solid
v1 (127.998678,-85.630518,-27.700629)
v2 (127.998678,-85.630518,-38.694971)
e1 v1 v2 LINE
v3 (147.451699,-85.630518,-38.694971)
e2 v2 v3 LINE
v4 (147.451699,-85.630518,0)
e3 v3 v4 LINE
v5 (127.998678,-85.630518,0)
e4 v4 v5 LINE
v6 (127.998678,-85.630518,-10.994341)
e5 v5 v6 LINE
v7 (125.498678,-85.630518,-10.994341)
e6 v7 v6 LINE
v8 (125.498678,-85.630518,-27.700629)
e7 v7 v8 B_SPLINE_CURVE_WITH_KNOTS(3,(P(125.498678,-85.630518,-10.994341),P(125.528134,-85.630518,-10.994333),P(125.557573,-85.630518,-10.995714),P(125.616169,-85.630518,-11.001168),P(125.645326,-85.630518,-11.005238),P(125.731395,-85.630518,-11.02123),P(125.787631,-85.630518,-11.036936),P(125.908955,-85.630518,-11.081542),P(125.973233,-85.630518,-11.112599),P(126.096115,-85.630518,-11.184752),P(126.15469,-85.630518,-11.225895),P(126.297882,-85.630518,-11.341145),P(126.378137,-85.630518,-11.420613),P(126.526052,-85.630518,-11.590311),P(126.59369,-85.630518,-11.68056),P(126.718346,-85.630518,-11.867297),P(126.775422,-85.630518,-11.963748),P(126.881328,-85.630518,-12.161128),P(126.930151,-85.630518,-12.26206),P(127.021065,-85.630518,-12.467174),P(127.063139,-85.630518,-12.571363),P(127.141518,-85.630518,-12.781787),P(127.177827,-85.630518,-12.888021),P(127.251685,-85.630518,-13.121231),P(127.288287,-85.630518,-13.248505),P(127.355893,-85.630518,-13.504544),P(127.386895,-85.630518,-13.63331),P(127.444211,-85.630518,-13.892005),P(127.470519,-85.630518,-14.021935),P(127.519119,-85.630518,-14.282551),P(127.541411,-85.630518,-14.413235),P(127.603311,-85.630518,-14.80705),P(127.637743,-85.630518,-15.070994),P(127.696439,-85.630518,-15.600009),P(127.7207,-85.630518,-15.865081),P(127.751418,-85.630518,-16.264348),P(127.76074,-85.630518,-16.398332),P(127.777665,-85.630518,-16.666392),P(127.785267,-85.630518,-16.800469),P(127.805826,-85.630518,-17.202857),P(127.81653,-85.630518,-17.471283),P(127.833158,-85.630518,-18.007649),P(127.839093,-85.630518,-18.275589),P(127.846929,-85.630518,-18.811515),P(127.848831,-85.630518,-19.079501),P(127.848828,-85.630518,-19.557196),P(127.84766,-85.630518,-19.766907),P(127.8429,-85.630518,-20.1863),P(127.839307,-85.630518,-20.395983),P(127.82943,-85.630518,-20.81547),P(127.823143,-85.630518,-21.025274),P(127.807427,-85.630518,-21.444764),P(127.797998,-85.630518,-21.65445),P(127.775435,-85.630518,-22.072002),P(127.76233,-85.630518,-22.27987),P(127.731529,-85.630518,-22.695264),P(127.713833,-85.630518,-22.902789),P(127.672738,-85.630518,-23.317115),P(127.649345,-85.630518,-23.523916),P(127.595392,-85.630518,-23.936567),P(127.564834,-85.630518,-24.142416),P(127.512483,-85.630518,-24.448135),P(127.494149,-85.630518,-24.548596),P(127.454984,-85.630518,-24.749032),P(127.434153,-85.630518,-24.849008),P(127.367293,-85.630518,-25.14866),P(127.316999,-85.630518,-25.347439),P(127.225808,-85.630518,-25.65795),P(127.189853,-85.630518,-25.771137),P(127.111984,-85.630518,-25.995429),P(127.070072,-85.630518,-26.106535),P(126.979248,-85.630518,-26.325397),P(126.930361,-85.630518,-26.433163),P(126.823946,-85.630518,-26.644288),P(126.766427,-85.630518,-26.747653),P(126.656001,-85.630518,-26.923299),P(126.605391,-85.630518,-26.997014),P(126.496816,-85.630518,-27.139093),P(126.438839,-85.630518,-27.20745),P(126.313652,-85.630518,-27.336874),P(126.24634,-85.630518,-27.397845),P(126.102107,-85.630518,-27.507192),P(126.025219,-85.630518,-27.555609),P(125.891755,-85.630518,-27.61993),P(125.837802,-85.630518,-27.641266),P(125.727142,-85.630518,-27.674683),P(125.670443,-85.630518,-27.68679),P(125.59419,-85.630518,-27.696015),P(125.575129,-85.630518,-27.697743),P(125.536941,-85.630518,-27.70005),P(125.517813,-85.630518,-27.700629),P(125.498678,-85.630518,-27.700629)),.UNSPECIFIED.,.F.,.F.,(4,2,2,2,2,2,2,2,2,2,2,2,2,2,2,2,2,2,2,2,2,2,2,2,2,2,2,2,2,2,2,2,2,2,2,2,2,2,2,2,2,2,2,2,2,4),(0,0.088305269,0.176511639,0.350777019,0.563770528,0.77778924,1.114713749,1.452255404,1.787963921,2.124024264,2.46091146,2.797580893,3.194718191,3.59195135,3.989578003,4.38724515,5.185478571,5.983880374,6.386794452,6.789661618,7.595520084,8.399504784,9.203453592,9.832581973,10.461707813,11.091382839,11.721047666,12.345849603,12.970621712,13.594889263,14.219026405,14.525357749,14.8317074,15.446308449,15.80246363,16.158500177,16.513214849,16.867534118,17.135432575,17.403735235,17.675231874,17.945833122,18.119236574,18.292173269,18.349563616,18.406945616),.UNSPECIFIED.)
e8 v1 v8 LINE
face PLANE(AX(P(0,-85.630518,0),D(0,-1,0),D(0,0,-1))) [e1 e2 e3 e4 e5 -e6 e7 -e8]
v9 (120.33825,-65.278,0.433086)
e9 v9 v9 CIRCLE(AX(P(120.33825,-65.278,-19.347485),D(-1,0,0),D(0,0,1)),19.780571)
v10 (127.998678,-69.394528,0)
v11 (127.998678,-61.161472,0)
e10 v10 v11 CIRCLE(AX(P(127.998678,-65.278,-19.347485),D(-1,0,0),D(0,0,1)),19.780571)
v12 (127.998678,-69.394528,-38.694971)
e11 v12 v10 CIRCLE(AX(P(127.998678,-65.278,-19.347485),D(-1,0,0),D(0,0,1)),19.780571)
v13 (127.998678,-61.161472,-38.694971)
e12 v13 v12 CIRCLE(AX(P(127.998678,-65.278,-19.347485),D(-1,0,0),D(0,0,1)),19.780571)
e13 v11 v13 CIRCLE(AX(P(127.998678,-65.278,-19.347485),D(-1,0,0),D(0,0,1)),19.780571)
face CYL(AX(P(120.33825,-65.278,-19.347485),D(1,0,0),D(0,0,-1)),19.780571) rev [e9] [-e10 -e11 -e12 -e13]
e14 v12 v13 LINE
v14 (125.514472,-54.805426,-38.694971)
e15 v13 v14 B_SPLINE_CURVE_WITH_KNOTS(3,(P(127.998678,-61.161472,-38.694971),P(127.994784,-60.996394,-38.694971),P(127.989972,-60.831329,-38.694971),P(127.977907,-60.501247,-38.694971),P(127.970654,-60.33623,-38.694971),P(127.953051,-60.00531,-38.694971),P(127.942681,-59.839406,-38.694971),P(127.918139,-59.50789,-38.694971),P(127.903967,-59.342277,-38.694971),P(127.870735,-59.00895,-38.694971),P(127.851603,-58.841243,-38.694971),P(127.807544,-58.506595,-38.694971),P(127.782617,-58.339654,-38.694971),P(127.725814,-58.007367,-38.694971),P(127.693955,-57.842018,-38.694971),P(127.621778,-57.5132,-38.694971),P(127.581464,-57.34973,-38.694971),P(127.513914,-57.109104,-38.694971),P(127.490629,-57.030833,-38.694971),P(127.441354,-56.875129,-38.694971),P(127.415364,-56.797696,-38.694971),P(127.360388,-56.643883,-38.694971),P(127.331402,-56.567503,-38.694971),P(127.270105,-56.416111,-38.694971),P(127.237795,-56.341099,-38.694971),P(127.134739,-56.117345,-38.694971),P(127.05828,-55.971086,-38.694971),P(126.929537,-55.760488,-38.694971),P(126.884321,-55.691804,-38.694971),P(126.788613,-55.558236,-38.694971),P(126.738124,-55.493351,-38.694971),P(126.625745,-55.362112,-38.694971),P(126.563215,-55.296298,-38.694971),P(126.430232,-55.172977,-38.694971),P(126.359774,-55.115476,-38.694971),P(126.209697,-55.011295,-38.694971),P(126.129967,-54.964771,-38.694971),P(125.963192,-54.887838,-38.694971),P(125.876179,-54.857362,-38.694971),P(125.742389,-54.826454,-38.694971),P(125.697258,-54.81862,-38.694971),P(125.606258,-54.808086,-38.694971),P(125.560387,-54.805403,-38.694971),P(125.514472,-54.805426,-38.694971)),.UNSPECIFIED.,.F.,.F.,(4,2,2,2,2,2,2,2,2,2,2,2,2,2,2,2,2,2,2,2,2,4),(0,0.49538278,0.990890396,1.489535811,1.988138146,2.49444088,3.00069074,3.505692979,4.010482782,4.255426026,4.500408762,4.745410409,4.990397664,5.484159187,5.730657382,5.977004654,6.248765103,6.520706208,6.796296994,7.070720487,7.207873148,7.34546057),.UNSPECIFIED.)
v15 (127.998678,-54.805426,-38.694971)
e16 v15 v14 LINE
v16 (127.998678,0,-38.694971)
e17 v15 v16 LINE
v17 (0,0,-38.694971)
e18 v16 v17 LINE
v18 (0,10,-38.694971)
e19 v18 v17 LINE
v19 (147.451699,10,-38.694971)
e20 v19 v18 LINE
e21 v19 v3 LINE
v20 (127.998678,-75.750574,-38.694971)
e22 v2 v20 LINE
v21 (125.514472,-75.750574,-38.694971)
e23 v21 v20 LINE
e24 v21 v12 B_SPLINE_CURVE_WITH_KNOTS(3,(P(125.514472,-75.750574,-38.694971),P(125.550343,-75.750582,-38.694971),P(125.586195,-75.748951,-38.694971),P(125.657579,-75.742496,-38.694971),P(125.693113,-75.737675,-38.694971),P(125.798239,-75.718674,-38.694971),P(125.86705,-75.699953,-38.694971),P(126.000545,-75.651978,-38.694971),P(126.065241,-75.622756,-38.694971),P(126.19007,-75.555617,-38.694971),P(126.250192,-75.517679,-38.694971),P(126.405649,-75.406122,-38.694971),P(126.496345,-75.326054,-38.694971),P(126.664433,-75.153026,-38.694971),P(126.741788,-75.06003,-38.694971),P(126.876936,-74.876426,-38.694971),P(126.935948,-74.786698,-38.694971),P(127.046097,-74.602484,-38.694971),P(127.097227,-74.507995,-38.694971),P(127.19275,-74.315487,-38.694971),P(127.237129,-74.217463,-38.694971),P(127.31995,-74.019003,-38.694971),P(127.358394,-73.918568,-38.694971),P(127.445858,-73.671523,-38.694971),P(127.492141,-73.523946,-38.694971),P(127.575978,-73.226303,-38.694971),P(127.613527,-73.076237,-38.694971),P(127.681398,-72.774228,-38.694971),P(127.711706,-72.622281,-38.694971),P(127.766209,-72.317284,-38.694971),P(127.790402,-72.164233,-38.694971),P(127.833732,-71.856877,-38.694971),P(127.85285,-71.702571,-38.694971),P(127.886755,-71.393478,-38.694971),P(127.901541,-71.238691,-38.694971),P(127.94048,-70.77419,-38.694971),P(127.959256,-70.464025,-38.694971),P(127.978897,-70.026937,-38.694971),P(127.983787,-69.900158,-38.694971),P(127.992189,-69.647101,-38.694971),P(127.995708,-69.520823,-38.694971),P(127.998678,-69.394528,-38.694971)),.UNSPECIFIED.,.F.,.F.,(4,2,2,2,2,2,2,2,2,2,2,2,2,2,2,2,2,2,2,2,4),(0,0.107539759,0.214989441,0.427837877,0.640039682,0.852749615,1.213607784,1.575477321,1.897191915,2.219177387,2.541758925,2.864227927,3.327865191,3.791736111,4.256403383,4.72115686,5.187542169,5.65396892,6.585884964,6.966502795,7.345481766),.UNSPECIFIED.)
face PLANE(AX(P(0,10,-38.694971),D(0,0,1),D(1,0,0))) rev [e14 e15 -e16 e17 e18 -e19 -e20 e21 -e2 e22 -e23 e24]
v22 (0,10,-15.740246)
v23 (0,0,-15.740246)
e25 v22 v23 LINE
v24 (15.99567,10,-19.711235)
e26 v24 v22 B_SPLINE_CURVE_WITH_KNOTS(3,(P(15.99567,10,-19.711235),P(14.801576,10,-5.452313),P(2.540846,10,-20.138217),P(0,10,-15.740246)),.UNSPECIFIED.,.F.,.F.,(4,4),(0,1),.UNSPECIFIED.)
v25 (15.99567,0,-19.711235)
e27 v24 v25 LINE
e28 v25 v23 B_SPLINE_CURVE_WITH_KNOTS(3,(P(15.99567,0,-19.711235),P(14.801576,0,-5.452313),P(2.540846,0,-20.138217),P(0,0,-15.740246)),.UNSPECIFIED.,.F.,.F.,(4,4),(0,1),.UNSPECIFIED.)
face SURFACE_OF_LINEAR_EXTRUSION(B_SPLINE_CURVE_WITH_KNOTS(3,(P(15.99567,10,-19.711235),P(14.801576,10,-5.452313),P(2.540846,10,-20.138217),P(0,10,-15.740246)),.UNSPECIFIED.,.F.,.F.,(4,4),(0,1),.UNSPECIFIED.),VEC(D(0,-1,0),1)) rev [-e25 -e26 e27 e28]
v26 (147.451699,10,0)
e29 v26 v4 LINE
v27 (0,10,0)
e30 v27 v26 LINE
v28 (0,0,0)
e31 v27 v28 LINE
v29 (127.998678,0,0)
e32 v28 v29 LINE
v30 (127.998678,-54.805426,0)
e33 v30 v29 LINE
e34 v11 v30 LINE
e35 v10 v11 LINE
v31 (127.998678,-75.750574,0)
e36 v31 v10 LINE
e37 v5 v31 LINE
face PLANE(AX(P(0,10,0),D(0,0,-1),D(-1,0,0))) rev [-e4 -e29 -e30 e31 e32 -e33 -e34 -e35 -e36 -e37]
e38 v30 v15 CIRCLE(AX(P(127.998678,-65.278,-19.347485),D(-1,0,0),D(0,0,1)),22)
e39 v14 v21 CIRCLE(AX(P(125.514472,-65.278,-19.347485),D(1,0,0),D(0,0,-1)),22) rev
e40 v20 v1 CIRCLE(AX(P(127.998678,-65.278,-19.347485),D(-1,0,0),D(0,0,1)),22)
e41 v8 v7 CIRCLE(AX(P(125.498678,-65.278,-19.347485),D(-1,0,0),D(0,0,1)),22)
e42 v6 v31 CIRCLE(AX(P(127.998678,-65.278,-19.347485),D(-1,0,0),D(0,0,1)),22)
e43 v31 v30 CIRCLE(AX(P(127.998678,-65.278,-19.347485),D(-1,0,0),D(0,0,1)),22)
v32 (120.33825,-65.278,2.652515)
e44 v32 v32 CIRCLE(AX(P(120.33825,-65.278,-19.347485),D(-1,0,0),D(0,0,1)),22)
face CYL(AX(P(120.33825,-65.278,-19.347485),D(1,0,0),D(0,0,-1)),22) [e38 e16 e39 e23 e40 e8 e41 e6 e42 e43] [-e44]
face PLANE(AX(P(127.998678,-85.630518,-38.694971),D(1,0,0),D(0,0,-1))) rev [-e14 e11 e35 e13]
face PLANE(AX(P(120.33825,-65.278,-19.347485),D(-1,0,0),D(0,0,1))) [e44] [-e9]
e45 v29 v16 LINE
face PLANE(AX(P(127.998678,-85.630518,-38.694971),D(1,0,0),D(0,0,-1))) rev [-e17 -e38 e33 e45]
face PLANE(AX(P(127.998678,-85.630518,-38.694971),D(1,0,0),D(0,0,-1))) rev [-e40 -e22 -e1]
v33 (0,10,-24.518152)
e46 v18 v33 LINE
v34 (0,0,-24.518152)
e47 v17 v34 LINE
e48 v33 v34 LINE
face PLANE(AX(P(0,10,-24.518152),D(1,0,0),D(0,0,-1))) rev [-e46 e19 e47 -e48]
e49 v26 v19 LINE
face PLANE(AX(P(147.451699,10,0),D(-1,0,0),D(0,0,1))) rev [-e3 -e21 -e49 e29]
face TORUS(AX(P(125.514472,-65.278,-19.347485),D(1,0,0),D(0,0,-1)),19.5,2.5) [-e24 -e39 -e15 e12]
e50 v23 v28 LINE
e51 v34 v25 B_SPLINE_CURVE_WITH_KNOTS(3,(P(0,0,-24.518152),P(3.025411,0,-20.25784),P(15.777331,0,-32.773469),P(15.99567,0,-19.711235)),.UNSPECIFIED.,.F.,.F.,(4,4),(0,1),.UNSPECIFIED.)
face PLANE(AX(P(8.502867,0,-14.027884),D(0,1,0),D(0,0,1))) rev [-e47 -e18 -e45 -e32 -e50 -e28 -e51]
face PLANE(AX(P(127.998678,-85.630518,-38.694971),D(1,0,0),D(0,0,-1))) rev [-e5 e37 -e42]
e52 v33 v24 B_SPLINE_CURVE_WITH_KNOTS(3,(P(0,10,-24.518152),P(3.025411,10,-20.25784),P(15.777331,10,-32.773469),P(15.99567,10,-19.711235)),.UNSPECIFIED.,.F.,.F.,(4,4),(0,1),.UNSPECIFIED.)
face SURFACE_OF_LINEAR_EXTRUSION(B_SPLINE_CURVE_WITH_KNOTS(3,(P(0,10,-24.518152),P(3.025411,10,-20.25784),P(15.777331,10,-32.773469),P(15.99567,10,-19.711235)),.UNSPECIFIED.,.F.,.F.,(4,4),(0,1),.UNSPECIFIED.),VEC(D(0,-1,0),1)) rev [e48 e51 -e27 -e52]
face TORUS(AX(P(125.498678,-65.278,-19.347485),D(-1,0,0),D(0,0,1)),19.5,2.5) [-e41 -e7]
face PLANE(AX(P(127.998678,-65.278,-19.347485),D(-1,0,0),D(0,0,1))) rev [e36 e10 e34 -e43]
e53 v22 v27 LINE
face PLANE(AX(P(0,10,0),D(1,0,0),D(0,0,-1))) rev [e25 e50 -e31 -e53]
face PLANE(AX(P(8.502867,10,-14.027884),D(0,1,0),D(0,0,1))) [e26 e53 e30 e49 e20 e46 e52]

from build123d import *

# Parameters (mm, degrees)
BOSS_EXTRUDE1_DEPTH = 10
SKETCH5_W           = 19.453021512
SKETCH5_H           = 38.694970839
BOSS_EXTRUDE2_DEPTH = 85.63051792
SKETCH6_R           = 22
SKETCH6_R_2         = 19.780571117
BOSS_EXTRUDE5_DEPTH = 7.660427645
FILLET10_R          = 2.5
FILLET11_R          = 2.5


with BuildPart() as part:
    # Sketch1 → Boss-Extrude1 (new body)
    with BuildSketch(Plane(origin=(0, 0, 0), x_dir=(1, 0, 0), z_dir=(0, 1, 0))):
        with BuildLine():
            Line((0, 24.518151768), (0, 38.694970839))
            Line((0, 38.694970839), (147.451699193, 38.694970839))
            Line((147.451699193, 38.694970839), (147.451699193, 0))
            Line((147.451699193, 0), (0, 0))
            Line((0, 0), (0, 15.74024552))
            add(Edge.make_bspline(
                [(0, 15.74024552), (2.540846011, 20.138217128), (14.801575787, 5.452312854), (15.995670115, 19.711234682)],
                knots=[0, 0, 0, 0, 1, 1, 1, 1], degree=3))
            add(Edge.make_bspline(
                [(0, 24.518151768), (3.025411482, 20.257839716), (15.777331359, 32.77346932), (15.995670115, 19.711234682)],
                knots=[0, 0, 0, 0, 1, 1, 1, 1], degree=3))
        make_face()
    extrude(amount=BOSS_EXTRUDE1_DEPTH)

    # Sketch5 → Boss-Extrude2 (add)
    with BuildSketch(Plane.XZ):
        with Locations((137.725188437, -19.347485419)):
            Rectangle(SKETCH5_W, SKETCH5_H)
    extrude(amount=BOSS_EXTRUDE2_DEPTH)

    # Sketch6 → Boss-Extrude5 (add)
    with BuildSketch(Plane.ZY.offset(-127.998677681)):
        with Locations(Location((-19.34748542, -65.278, 0), (0, 0, 151.573820003))):
            Circle(SKETCH6_R)
        with Locations(Location((-19.34748542, -65.278, 0), (0, 0, 192.011596254))):
            Circle(SKETCH6_R_2, mode=Mode.SUBTRACT)
    extrude(amount=BOSS_EXTRUDE5_DEPTH)

    # Fillet10
    # the kernel refuses this fillet: 2.5 mm, written as the material it takes off along each edge
    with BuildSketch(Plane(origin=(127.998677681, -65.278, -19.34748542), x_dir=(0, 0.7021921970481064, -0.711987442589231), z_dir=(0, 0.711987442589231, 0.7021921970481064))) as fillet10_piece_1_section:
        with BuildLine():
            CenterArc((19.5, 2.48420608), FILLET10_R, 276.443791757, 83.556208243)
            Line((22, 2.48420608), (22, 0))
            Line((22, 0), (19.780571117, 0))
        make_face()
    fillet10_piece_1 = revolve(axis=Axis((127.998677681, -65.278, -19.34748542), (-1, 0, 0)), revolution_arc=89.20629991, mode=Mode.PRIVATE)
    fillet10_piece_1 = split(fillet10_piece_1, bisect_by=Plane(origin=(127.183421673, -65.278, -38.694970839), z_dir=(0, 0, -1)), keep=Keep.TOP, mode=Mode.PRIVATE)
    add(fillet10_piece_1, mode=Mode.SUBTRACT)

    # Fillet11
    # the kernel refuses this fillet: 2.5 mm, written as the material it takes off along each edge
    with BuildSketch(Plane(origin=(127.998677681, -65.278, -19.34748542), x_dir=(0, -0.7815945319539552, -0.6237868126368795), z_dir=(0, 0.6237868126368795, -0.7815945319539552))) as fillet11_piece_1_section:
        with BuildLine():
            CenterArc((22 - FILLET11_R, FILLET11_R), FILLET11_R, 270, 90)
            Line((22, FILLET11_R), (22, 0))
            Line((22, 0), (22 - FILLET11_R, 0))
        make_face()
    fillet11_piece_1 = revolve(axis=Axis((127.998677681, -65.278, -19.34748542), (-1, 0, 0)), revolution_arc=77.186396047, mode=Mode.PRIVATE)
    fillet11_piece_1 = split(fillet11_piece_1, bisect_by=Plane(origin=(127.364659544, -85.63051792, -19.347486624), z_dir=(0, -1, 0)), keep=Keep.TOP, mode=Mode.PRIVATE)
    add(fillet11_piece_1, mode=Mode.SUBTRACT)


solid = part.part
